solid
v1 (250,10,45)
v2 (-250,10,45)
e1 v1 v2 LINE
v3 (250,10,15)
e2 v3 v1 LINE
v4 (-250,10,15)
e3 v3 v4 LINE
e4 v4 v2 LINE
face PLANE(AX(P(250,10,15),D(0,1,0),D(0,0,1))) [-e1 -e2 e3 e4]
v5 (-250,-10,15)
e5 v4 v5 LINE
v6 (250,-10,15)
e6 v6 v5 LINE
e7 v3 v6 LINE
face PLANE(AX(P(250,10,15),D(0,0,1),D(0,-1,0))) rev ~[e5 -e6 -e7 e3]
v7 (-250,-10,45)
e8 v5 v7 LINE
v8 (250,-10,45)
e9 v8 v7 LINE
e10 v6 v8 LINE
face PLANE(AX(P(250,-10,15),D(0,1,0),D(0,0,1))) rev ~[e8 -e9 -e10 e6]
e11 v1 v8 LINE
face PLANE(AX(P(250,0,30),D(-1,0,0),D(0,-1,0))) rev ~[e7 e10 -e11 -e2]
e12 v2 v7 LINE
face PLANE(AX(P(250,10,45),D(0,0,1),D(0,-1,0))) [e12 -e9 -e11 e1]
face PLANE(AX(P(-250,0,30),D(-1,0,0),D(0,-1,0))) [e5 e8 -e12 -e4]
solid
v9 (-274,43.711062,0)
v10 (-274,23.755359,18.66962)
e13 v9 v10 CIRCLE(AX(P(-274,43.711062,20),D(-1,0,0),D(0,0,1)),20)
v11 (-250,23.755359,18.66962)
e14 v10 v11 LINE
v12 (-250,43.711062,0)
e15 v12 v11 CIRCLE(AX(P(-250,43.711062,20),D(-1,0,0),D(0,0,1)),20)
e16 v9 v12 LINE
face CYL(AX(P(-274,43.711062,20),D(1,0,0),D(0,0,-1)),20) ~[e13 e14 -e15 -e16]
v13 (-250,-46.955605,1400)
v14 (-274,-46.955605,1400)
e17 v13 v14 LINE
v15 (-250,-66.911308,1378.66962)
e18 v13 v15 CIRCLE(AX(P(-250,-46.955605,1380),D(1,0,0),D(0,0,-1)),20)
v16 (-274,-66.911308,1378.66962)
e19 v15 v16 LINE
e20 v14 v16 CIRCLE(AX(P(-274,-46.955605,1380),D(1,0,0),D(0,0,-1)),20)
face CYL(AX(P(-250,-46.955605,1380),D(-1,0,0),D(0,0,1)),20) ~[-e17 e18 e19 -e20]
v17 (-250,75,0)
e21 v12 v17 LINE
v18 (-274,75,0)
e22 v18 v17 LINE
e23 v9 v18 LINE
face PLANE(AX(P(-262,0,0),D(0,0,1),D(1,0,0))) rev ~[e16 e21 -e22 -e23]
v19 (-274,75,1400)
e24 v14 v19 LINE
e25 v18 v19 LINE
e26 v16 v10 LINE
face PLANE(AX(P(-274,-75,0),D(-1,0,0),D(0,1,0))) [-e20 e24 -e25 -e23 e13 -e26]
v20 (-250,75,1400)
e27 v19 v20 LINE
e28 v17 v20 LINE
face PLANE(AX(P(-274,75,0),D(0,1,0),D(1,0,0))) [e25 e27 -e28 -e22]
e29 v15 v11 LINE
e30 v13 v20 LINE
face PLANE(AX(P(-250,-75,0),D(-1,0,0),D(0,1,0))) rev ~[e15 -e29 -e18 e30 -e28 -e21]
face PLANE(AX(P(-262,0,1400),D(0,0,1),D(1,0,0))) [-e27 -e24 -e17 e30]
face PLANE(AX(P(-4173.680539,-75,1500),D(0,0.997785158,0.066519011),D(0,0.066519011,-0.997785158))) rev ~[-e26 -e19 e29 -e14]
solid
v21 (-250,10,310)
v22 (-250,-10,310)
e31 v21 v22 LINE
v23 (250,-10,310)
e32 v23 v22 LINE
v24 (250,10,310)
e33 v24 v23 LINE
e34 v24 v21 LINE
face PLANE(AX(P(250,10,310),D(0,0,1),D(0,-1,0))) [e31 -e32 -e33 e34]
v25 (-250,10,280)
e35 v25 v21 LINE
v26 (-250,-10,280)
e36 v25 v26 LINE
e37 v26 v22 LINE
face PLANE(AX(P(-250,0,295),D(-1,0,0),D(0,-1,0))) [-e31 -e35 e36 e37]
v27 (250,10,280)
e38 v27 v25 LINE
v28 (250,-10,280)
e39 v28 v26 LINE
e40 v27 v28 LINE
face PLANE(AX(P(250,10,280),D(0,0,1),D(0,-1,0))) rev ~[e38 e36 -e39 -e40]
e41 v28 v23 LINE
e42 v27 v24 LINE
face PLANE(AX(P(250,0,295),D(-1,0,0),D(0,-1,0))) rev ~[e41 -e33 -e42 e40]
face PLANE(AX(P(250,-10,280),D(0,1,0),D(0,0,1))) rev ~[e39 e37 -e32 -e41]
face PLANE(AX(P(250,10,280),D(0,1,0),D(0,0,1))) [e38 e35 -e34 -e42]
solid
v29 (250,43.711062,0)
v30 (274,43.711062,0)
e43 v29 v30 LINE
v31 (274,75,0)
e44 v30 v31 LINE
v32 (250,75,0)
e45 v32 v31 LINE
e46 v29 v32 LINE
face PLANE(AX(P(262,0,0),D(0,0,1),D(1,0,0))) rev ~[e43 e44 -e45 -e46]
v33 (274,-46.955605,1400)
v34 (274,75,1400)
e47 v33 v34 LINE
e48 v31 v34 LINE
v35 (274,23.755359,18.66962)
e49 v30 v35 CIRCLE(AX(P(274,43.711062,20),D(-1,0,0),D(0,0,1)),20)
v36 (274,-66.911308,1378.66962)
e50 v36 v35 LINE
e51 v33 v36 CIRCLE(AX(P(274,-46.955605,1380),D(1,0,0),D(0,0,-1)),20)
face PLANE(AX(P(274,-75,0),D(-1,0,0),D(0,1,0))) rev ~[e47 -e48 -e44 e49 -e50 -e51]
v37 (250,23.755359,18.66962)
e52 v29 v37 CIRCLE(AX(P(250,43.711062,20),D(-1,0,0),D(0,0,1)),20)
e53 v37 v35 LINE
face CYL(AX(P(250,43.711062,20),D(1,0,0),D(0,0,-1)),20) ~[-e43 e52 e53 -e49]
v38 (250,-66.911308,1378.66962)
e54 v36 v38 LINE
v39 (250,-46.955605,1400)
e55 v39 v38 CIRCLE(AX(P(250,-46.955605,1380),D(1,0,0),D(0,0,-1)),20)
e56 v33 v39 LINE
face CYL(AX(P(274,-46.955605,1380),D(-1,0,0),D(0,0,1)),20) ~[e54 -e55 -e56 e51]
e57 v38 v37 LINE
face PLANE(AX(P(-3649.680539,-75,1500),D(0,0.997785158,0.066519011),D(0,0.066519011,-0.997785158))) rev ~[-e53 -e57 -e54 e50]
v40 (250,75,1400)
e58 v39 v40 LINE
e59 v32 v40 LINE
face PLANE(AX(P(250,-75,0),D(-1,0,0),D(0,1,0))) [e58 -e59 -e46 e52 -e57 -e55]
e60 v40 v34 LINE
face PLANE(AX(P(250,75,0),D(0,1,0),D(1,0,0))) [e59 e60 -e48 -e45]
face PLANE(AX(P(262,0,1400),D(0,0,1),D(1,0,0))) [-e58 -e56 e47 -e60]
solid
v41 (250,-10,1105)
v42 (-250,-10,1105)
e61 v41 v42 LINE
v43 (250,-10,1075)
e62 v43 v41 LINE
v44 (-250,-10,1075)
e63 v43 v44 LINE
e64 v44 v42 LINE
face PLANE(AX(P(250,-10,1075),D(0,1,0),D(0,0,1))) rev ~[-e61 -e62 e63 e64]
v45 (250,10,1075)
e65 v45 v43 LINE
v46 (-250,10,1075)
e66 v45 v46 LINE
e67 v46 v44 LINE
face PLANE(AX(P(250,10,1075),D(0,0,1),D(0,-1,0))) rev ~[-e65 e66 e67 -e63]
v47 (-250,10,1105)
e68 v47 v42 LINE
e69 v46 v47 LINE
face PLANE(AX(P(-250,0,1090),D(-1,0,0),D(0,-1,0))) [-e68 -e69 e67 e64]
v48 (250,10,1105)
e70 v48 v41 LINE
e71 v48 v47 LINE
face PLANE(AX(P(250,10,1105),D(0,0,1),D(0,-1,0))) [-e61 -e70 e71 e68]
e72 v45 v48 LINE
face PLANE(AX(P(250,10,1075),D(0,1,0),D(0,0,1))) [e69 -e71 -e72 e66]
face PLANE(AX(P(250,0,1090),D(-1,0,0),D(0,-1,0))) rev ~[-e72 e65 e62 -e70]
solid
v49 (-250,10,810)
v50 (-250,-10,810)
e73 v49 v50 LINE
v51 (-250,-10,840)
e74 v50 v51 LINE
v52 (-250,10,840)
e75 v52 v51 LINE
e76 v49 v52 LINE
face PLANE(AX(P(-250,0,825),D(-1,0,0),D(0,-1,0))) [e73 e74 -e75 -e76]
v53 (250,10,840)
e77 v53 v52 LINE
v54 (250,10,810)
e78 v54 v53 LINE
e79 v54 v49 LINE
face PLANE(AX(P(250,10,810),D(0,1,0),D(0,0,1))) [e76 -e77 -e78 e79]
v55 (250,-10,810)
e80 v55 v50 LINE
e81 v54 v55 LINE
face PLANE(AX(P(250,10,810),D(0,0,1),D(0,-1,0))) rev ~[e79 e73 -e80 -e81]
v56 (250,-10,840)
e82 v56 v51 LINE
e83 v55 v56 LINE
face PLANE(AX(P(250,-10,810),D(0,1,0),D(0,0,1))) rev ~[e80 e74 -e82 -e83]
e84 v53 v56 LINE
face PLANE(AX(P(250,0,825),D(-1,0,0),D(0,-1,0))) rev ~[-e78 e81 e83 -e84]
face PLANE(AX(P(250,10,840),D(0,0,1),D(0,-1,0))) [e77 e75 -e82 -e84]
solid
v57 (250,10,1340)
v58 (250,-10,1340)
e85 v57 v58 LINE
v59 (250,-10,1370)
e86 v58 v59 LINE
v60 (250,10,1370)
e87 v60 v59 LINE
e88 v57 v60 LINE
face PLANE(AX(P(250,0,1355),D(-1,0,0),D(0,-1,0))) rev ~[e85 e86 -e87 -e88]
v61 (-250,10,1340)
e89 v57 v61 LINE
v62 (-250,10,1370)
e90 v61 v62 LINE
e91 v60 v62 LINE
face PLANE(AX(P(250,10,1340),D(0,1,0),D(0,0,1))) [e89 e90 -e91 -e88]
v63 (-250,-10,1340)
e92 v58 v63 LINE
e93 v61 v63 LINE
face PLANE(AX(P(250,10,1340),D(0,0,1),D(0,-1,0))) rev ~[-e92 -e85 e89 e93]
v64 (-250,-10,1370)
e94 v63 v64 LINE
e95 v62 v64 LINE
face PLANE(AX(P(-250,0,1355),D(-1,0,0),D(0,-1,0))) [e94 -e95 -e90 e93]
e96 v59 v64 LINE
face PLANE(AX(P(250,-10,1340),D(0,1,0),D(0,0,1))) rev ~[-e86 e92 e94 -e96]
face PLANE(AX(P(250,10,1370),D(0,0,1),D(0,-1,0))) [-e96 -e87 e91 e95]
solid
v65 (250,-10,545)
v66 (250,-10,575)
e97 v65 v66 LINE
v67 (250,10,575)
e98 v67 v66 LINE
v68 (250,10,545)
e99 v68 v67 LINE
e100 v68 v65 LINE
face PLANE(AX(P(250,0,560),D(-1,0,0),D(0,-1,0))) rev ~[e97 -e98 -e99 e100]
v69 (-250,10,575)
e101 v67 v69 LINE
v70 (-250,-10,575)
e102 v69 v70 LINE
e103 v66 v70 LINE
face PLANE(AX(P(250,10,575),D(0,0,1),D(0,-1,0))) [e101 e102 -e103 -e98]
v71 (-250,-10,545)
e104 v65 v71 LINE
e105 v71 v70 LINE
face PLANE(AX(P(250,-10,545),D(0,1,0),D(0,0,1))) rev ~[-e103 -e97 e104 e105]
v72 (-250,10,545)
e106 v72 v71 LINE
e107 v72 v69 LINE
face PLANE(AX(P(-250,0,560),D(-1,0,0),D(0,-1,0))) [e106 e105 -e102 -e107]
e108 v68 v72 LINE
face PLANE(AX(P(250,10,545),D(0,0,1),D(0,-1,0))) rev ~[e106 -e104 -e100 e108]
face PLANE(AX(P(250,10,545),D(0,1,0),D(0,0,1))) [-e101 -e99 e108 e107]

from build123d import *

# Parameters (mm, degrees)
F0_W          = 24
F0_H          = 150
F1_DEPTH      = 1400
F2_W          = 20
F2_H          = 30
F3_DEPTH      = 500
F4_T1_DEPTH   = 7823.3610770598
F4_2_T1_DEPTH = 7823.3610770598
F12_R         = 20
F12_2_R       = 20


# Not quite as in the source:
# - a fillet or chamfer that OpenCascade refuses, or shapes differently, is made with other operations: its cross-section is extruded or revolved along the edge and cut away or added
# - two fillets or chamfers of one size are made in one step


with BuildPart() as f1:
    # F0 (on Top) → F1 (new body)
    with BuildSketch(Plane.XY):
        with Locations((-262, 0)):
            Rectangle(F0_W, F0_H)
    extrude(amount=F1_DEPTH)

    # F4: chamfer of 100 x 1500 on 1 edges, made by hand

    # F4_s2 → F4_t1 (cut)
    with BuildSketch(Plane.YZ.offset(-4173.6805385299)):
        Polygon((-75, 1500), (25, 0), (-75, 0), align=None)
    extrude(amount=F4_T1_DEPTH, mode=Mode.SUBTRACT)

    # F12
    f12_edges = [f1.edges().sort_by_distance(p)[0] for p in [
        (-262, -68.333333, 1400),
        (-262, 25, 0),
    ]]
    fillet(f12_edges, radius=F12_R)


with BuildPart() as f1b:
    # F0 (on Top) → F1, piece 2 (new body)
    with BuildSketch(Plane.XY):
        with Locations((262, 0)):
            Rectangle(F0_W, F0_H)
    extrude(amount=F1_DEPTH)

    # F4#2: chamfer of 100 x 1500 on 1 edges, made by hand

    # F4_2_s2 → F4_2_t1 (cut)
    with BuildSketch(Plane.YZ.offset(-3649.6805385299)):
        Polygon((-75, 1500), (25, 0), (-75, 0), align=None)
    extrude(amount=F4_2_T1_DEPTH, mode=Mode.SUBTRACT)

    # F12#2
    f12_2_edges = [f1b.edges().sort_by_distance(p)[0] for p in [
        (262, 25, 0),
        (262, -68.333333, 1400),
    ]]
    fillet(f12_2_edges, radius=F12_2_R)


with BuildPart() as f3:
    # F2 (on face) → F3 (new body, through all)
    with BuildSketch(Plane(origin=(250, 0, 0), x_dir=(0, -1, 0), z_dir=(-1, 0, 0))):
        with Locations((0, 1355)):
            Rectangle(F2_W, F2_H)
    extrude(amount=F3_DEPTH)


with BuildPart() as f3b:
    # F2 (on face) → F3, piece 2 (new body, through all)
    with BuildSketch(Plane(origin=(250, 0, 0), x_dir=(0, -1, 0), z_dir=(-1, 0, 0))):
        with Locations((0, 1090)):
            Rectangle(F2_W, F2_H)
    extrude(amount=F3_DEPTH)


with BuildPart() as f3c:
    # F2 (on face) → F3, piece 3 (new body, through all)
    with BuildSketch(Plane(origin=(250, 0, 0), x_dir=(0, -1, 0), z_dir=(-1, 0, 0))):
        with Locations((0, 825)):
            Rectangle(F2_W, F2_H)
    extrude(amount=F3_DEPTH)


with BuildPart() as f3d:
    # F2 (on face) → F3, piece 4 (new body, through all)
    with BuildSketch(Plane(origin=(250, 0, 0), x_dir=(0, -1, 0), z_dir=(-1, 0, 0))):
        with Locations((0, 560)):
            Rectangle(F2_W, F2_H)
    extrude(amount=F3_DEPTH)


with BuildPart() as f3e:
    # F2 (on face) → F3, piece 5 (new body, through all)
    with BuildSketch(Plane(origin=(250, 0, 0), x_dir=(0, -1, 0), z_dir=(-1, 0, 0))):
        with Locations((0, 30)):
            Rectangle(F2_W, F2_H)
    extrude(amount=F3_DEPTH)


with BuildPart() as f3f:
    # F2 (on face) → F3, piece 6 (new body, through all)
    with BuildSketch(Plane(origin=(250, 0, 0), x_dir=(0, -1, 0), z_dir=(-1, 0, 0))):
        with Locations((0, 295)):
            Rectangle(F2_W, F2_H)
    extrude(amount=F3_DEPTH)


with BuildPart() as f3_1:
    # F6: moved
    add(f3.part.moved(Location((0, -50, 0))))


with BuildPart() as f3b_1:
    # F7: moved
    add(f3b.part.moved(Location((0, -30, 0))))


with BuildPart() as f3c_1:
    # F8: moved
    add(f3c.part.moved(Location((0, -10, 0))))


with BuildPart() as f3d_1:
    # F9: moved
    add(f3d.part.moved(Location((0, 10, 0))))


with BuildPart() as f3f_1:
    # F10: moved
    add(f3f.part.moved(Location((0, 30, 0))))


with BuildPart() as f3e_1:
    # F11: moved
    add(f3e.part.moved(Location((0, 50, 0))))


solid = Compound([f1.part, f1b.part, f3_1.part, f3b_1.part, f3c_1.part, f3d_1.part, f3f_1.part, f3e_1.part])
